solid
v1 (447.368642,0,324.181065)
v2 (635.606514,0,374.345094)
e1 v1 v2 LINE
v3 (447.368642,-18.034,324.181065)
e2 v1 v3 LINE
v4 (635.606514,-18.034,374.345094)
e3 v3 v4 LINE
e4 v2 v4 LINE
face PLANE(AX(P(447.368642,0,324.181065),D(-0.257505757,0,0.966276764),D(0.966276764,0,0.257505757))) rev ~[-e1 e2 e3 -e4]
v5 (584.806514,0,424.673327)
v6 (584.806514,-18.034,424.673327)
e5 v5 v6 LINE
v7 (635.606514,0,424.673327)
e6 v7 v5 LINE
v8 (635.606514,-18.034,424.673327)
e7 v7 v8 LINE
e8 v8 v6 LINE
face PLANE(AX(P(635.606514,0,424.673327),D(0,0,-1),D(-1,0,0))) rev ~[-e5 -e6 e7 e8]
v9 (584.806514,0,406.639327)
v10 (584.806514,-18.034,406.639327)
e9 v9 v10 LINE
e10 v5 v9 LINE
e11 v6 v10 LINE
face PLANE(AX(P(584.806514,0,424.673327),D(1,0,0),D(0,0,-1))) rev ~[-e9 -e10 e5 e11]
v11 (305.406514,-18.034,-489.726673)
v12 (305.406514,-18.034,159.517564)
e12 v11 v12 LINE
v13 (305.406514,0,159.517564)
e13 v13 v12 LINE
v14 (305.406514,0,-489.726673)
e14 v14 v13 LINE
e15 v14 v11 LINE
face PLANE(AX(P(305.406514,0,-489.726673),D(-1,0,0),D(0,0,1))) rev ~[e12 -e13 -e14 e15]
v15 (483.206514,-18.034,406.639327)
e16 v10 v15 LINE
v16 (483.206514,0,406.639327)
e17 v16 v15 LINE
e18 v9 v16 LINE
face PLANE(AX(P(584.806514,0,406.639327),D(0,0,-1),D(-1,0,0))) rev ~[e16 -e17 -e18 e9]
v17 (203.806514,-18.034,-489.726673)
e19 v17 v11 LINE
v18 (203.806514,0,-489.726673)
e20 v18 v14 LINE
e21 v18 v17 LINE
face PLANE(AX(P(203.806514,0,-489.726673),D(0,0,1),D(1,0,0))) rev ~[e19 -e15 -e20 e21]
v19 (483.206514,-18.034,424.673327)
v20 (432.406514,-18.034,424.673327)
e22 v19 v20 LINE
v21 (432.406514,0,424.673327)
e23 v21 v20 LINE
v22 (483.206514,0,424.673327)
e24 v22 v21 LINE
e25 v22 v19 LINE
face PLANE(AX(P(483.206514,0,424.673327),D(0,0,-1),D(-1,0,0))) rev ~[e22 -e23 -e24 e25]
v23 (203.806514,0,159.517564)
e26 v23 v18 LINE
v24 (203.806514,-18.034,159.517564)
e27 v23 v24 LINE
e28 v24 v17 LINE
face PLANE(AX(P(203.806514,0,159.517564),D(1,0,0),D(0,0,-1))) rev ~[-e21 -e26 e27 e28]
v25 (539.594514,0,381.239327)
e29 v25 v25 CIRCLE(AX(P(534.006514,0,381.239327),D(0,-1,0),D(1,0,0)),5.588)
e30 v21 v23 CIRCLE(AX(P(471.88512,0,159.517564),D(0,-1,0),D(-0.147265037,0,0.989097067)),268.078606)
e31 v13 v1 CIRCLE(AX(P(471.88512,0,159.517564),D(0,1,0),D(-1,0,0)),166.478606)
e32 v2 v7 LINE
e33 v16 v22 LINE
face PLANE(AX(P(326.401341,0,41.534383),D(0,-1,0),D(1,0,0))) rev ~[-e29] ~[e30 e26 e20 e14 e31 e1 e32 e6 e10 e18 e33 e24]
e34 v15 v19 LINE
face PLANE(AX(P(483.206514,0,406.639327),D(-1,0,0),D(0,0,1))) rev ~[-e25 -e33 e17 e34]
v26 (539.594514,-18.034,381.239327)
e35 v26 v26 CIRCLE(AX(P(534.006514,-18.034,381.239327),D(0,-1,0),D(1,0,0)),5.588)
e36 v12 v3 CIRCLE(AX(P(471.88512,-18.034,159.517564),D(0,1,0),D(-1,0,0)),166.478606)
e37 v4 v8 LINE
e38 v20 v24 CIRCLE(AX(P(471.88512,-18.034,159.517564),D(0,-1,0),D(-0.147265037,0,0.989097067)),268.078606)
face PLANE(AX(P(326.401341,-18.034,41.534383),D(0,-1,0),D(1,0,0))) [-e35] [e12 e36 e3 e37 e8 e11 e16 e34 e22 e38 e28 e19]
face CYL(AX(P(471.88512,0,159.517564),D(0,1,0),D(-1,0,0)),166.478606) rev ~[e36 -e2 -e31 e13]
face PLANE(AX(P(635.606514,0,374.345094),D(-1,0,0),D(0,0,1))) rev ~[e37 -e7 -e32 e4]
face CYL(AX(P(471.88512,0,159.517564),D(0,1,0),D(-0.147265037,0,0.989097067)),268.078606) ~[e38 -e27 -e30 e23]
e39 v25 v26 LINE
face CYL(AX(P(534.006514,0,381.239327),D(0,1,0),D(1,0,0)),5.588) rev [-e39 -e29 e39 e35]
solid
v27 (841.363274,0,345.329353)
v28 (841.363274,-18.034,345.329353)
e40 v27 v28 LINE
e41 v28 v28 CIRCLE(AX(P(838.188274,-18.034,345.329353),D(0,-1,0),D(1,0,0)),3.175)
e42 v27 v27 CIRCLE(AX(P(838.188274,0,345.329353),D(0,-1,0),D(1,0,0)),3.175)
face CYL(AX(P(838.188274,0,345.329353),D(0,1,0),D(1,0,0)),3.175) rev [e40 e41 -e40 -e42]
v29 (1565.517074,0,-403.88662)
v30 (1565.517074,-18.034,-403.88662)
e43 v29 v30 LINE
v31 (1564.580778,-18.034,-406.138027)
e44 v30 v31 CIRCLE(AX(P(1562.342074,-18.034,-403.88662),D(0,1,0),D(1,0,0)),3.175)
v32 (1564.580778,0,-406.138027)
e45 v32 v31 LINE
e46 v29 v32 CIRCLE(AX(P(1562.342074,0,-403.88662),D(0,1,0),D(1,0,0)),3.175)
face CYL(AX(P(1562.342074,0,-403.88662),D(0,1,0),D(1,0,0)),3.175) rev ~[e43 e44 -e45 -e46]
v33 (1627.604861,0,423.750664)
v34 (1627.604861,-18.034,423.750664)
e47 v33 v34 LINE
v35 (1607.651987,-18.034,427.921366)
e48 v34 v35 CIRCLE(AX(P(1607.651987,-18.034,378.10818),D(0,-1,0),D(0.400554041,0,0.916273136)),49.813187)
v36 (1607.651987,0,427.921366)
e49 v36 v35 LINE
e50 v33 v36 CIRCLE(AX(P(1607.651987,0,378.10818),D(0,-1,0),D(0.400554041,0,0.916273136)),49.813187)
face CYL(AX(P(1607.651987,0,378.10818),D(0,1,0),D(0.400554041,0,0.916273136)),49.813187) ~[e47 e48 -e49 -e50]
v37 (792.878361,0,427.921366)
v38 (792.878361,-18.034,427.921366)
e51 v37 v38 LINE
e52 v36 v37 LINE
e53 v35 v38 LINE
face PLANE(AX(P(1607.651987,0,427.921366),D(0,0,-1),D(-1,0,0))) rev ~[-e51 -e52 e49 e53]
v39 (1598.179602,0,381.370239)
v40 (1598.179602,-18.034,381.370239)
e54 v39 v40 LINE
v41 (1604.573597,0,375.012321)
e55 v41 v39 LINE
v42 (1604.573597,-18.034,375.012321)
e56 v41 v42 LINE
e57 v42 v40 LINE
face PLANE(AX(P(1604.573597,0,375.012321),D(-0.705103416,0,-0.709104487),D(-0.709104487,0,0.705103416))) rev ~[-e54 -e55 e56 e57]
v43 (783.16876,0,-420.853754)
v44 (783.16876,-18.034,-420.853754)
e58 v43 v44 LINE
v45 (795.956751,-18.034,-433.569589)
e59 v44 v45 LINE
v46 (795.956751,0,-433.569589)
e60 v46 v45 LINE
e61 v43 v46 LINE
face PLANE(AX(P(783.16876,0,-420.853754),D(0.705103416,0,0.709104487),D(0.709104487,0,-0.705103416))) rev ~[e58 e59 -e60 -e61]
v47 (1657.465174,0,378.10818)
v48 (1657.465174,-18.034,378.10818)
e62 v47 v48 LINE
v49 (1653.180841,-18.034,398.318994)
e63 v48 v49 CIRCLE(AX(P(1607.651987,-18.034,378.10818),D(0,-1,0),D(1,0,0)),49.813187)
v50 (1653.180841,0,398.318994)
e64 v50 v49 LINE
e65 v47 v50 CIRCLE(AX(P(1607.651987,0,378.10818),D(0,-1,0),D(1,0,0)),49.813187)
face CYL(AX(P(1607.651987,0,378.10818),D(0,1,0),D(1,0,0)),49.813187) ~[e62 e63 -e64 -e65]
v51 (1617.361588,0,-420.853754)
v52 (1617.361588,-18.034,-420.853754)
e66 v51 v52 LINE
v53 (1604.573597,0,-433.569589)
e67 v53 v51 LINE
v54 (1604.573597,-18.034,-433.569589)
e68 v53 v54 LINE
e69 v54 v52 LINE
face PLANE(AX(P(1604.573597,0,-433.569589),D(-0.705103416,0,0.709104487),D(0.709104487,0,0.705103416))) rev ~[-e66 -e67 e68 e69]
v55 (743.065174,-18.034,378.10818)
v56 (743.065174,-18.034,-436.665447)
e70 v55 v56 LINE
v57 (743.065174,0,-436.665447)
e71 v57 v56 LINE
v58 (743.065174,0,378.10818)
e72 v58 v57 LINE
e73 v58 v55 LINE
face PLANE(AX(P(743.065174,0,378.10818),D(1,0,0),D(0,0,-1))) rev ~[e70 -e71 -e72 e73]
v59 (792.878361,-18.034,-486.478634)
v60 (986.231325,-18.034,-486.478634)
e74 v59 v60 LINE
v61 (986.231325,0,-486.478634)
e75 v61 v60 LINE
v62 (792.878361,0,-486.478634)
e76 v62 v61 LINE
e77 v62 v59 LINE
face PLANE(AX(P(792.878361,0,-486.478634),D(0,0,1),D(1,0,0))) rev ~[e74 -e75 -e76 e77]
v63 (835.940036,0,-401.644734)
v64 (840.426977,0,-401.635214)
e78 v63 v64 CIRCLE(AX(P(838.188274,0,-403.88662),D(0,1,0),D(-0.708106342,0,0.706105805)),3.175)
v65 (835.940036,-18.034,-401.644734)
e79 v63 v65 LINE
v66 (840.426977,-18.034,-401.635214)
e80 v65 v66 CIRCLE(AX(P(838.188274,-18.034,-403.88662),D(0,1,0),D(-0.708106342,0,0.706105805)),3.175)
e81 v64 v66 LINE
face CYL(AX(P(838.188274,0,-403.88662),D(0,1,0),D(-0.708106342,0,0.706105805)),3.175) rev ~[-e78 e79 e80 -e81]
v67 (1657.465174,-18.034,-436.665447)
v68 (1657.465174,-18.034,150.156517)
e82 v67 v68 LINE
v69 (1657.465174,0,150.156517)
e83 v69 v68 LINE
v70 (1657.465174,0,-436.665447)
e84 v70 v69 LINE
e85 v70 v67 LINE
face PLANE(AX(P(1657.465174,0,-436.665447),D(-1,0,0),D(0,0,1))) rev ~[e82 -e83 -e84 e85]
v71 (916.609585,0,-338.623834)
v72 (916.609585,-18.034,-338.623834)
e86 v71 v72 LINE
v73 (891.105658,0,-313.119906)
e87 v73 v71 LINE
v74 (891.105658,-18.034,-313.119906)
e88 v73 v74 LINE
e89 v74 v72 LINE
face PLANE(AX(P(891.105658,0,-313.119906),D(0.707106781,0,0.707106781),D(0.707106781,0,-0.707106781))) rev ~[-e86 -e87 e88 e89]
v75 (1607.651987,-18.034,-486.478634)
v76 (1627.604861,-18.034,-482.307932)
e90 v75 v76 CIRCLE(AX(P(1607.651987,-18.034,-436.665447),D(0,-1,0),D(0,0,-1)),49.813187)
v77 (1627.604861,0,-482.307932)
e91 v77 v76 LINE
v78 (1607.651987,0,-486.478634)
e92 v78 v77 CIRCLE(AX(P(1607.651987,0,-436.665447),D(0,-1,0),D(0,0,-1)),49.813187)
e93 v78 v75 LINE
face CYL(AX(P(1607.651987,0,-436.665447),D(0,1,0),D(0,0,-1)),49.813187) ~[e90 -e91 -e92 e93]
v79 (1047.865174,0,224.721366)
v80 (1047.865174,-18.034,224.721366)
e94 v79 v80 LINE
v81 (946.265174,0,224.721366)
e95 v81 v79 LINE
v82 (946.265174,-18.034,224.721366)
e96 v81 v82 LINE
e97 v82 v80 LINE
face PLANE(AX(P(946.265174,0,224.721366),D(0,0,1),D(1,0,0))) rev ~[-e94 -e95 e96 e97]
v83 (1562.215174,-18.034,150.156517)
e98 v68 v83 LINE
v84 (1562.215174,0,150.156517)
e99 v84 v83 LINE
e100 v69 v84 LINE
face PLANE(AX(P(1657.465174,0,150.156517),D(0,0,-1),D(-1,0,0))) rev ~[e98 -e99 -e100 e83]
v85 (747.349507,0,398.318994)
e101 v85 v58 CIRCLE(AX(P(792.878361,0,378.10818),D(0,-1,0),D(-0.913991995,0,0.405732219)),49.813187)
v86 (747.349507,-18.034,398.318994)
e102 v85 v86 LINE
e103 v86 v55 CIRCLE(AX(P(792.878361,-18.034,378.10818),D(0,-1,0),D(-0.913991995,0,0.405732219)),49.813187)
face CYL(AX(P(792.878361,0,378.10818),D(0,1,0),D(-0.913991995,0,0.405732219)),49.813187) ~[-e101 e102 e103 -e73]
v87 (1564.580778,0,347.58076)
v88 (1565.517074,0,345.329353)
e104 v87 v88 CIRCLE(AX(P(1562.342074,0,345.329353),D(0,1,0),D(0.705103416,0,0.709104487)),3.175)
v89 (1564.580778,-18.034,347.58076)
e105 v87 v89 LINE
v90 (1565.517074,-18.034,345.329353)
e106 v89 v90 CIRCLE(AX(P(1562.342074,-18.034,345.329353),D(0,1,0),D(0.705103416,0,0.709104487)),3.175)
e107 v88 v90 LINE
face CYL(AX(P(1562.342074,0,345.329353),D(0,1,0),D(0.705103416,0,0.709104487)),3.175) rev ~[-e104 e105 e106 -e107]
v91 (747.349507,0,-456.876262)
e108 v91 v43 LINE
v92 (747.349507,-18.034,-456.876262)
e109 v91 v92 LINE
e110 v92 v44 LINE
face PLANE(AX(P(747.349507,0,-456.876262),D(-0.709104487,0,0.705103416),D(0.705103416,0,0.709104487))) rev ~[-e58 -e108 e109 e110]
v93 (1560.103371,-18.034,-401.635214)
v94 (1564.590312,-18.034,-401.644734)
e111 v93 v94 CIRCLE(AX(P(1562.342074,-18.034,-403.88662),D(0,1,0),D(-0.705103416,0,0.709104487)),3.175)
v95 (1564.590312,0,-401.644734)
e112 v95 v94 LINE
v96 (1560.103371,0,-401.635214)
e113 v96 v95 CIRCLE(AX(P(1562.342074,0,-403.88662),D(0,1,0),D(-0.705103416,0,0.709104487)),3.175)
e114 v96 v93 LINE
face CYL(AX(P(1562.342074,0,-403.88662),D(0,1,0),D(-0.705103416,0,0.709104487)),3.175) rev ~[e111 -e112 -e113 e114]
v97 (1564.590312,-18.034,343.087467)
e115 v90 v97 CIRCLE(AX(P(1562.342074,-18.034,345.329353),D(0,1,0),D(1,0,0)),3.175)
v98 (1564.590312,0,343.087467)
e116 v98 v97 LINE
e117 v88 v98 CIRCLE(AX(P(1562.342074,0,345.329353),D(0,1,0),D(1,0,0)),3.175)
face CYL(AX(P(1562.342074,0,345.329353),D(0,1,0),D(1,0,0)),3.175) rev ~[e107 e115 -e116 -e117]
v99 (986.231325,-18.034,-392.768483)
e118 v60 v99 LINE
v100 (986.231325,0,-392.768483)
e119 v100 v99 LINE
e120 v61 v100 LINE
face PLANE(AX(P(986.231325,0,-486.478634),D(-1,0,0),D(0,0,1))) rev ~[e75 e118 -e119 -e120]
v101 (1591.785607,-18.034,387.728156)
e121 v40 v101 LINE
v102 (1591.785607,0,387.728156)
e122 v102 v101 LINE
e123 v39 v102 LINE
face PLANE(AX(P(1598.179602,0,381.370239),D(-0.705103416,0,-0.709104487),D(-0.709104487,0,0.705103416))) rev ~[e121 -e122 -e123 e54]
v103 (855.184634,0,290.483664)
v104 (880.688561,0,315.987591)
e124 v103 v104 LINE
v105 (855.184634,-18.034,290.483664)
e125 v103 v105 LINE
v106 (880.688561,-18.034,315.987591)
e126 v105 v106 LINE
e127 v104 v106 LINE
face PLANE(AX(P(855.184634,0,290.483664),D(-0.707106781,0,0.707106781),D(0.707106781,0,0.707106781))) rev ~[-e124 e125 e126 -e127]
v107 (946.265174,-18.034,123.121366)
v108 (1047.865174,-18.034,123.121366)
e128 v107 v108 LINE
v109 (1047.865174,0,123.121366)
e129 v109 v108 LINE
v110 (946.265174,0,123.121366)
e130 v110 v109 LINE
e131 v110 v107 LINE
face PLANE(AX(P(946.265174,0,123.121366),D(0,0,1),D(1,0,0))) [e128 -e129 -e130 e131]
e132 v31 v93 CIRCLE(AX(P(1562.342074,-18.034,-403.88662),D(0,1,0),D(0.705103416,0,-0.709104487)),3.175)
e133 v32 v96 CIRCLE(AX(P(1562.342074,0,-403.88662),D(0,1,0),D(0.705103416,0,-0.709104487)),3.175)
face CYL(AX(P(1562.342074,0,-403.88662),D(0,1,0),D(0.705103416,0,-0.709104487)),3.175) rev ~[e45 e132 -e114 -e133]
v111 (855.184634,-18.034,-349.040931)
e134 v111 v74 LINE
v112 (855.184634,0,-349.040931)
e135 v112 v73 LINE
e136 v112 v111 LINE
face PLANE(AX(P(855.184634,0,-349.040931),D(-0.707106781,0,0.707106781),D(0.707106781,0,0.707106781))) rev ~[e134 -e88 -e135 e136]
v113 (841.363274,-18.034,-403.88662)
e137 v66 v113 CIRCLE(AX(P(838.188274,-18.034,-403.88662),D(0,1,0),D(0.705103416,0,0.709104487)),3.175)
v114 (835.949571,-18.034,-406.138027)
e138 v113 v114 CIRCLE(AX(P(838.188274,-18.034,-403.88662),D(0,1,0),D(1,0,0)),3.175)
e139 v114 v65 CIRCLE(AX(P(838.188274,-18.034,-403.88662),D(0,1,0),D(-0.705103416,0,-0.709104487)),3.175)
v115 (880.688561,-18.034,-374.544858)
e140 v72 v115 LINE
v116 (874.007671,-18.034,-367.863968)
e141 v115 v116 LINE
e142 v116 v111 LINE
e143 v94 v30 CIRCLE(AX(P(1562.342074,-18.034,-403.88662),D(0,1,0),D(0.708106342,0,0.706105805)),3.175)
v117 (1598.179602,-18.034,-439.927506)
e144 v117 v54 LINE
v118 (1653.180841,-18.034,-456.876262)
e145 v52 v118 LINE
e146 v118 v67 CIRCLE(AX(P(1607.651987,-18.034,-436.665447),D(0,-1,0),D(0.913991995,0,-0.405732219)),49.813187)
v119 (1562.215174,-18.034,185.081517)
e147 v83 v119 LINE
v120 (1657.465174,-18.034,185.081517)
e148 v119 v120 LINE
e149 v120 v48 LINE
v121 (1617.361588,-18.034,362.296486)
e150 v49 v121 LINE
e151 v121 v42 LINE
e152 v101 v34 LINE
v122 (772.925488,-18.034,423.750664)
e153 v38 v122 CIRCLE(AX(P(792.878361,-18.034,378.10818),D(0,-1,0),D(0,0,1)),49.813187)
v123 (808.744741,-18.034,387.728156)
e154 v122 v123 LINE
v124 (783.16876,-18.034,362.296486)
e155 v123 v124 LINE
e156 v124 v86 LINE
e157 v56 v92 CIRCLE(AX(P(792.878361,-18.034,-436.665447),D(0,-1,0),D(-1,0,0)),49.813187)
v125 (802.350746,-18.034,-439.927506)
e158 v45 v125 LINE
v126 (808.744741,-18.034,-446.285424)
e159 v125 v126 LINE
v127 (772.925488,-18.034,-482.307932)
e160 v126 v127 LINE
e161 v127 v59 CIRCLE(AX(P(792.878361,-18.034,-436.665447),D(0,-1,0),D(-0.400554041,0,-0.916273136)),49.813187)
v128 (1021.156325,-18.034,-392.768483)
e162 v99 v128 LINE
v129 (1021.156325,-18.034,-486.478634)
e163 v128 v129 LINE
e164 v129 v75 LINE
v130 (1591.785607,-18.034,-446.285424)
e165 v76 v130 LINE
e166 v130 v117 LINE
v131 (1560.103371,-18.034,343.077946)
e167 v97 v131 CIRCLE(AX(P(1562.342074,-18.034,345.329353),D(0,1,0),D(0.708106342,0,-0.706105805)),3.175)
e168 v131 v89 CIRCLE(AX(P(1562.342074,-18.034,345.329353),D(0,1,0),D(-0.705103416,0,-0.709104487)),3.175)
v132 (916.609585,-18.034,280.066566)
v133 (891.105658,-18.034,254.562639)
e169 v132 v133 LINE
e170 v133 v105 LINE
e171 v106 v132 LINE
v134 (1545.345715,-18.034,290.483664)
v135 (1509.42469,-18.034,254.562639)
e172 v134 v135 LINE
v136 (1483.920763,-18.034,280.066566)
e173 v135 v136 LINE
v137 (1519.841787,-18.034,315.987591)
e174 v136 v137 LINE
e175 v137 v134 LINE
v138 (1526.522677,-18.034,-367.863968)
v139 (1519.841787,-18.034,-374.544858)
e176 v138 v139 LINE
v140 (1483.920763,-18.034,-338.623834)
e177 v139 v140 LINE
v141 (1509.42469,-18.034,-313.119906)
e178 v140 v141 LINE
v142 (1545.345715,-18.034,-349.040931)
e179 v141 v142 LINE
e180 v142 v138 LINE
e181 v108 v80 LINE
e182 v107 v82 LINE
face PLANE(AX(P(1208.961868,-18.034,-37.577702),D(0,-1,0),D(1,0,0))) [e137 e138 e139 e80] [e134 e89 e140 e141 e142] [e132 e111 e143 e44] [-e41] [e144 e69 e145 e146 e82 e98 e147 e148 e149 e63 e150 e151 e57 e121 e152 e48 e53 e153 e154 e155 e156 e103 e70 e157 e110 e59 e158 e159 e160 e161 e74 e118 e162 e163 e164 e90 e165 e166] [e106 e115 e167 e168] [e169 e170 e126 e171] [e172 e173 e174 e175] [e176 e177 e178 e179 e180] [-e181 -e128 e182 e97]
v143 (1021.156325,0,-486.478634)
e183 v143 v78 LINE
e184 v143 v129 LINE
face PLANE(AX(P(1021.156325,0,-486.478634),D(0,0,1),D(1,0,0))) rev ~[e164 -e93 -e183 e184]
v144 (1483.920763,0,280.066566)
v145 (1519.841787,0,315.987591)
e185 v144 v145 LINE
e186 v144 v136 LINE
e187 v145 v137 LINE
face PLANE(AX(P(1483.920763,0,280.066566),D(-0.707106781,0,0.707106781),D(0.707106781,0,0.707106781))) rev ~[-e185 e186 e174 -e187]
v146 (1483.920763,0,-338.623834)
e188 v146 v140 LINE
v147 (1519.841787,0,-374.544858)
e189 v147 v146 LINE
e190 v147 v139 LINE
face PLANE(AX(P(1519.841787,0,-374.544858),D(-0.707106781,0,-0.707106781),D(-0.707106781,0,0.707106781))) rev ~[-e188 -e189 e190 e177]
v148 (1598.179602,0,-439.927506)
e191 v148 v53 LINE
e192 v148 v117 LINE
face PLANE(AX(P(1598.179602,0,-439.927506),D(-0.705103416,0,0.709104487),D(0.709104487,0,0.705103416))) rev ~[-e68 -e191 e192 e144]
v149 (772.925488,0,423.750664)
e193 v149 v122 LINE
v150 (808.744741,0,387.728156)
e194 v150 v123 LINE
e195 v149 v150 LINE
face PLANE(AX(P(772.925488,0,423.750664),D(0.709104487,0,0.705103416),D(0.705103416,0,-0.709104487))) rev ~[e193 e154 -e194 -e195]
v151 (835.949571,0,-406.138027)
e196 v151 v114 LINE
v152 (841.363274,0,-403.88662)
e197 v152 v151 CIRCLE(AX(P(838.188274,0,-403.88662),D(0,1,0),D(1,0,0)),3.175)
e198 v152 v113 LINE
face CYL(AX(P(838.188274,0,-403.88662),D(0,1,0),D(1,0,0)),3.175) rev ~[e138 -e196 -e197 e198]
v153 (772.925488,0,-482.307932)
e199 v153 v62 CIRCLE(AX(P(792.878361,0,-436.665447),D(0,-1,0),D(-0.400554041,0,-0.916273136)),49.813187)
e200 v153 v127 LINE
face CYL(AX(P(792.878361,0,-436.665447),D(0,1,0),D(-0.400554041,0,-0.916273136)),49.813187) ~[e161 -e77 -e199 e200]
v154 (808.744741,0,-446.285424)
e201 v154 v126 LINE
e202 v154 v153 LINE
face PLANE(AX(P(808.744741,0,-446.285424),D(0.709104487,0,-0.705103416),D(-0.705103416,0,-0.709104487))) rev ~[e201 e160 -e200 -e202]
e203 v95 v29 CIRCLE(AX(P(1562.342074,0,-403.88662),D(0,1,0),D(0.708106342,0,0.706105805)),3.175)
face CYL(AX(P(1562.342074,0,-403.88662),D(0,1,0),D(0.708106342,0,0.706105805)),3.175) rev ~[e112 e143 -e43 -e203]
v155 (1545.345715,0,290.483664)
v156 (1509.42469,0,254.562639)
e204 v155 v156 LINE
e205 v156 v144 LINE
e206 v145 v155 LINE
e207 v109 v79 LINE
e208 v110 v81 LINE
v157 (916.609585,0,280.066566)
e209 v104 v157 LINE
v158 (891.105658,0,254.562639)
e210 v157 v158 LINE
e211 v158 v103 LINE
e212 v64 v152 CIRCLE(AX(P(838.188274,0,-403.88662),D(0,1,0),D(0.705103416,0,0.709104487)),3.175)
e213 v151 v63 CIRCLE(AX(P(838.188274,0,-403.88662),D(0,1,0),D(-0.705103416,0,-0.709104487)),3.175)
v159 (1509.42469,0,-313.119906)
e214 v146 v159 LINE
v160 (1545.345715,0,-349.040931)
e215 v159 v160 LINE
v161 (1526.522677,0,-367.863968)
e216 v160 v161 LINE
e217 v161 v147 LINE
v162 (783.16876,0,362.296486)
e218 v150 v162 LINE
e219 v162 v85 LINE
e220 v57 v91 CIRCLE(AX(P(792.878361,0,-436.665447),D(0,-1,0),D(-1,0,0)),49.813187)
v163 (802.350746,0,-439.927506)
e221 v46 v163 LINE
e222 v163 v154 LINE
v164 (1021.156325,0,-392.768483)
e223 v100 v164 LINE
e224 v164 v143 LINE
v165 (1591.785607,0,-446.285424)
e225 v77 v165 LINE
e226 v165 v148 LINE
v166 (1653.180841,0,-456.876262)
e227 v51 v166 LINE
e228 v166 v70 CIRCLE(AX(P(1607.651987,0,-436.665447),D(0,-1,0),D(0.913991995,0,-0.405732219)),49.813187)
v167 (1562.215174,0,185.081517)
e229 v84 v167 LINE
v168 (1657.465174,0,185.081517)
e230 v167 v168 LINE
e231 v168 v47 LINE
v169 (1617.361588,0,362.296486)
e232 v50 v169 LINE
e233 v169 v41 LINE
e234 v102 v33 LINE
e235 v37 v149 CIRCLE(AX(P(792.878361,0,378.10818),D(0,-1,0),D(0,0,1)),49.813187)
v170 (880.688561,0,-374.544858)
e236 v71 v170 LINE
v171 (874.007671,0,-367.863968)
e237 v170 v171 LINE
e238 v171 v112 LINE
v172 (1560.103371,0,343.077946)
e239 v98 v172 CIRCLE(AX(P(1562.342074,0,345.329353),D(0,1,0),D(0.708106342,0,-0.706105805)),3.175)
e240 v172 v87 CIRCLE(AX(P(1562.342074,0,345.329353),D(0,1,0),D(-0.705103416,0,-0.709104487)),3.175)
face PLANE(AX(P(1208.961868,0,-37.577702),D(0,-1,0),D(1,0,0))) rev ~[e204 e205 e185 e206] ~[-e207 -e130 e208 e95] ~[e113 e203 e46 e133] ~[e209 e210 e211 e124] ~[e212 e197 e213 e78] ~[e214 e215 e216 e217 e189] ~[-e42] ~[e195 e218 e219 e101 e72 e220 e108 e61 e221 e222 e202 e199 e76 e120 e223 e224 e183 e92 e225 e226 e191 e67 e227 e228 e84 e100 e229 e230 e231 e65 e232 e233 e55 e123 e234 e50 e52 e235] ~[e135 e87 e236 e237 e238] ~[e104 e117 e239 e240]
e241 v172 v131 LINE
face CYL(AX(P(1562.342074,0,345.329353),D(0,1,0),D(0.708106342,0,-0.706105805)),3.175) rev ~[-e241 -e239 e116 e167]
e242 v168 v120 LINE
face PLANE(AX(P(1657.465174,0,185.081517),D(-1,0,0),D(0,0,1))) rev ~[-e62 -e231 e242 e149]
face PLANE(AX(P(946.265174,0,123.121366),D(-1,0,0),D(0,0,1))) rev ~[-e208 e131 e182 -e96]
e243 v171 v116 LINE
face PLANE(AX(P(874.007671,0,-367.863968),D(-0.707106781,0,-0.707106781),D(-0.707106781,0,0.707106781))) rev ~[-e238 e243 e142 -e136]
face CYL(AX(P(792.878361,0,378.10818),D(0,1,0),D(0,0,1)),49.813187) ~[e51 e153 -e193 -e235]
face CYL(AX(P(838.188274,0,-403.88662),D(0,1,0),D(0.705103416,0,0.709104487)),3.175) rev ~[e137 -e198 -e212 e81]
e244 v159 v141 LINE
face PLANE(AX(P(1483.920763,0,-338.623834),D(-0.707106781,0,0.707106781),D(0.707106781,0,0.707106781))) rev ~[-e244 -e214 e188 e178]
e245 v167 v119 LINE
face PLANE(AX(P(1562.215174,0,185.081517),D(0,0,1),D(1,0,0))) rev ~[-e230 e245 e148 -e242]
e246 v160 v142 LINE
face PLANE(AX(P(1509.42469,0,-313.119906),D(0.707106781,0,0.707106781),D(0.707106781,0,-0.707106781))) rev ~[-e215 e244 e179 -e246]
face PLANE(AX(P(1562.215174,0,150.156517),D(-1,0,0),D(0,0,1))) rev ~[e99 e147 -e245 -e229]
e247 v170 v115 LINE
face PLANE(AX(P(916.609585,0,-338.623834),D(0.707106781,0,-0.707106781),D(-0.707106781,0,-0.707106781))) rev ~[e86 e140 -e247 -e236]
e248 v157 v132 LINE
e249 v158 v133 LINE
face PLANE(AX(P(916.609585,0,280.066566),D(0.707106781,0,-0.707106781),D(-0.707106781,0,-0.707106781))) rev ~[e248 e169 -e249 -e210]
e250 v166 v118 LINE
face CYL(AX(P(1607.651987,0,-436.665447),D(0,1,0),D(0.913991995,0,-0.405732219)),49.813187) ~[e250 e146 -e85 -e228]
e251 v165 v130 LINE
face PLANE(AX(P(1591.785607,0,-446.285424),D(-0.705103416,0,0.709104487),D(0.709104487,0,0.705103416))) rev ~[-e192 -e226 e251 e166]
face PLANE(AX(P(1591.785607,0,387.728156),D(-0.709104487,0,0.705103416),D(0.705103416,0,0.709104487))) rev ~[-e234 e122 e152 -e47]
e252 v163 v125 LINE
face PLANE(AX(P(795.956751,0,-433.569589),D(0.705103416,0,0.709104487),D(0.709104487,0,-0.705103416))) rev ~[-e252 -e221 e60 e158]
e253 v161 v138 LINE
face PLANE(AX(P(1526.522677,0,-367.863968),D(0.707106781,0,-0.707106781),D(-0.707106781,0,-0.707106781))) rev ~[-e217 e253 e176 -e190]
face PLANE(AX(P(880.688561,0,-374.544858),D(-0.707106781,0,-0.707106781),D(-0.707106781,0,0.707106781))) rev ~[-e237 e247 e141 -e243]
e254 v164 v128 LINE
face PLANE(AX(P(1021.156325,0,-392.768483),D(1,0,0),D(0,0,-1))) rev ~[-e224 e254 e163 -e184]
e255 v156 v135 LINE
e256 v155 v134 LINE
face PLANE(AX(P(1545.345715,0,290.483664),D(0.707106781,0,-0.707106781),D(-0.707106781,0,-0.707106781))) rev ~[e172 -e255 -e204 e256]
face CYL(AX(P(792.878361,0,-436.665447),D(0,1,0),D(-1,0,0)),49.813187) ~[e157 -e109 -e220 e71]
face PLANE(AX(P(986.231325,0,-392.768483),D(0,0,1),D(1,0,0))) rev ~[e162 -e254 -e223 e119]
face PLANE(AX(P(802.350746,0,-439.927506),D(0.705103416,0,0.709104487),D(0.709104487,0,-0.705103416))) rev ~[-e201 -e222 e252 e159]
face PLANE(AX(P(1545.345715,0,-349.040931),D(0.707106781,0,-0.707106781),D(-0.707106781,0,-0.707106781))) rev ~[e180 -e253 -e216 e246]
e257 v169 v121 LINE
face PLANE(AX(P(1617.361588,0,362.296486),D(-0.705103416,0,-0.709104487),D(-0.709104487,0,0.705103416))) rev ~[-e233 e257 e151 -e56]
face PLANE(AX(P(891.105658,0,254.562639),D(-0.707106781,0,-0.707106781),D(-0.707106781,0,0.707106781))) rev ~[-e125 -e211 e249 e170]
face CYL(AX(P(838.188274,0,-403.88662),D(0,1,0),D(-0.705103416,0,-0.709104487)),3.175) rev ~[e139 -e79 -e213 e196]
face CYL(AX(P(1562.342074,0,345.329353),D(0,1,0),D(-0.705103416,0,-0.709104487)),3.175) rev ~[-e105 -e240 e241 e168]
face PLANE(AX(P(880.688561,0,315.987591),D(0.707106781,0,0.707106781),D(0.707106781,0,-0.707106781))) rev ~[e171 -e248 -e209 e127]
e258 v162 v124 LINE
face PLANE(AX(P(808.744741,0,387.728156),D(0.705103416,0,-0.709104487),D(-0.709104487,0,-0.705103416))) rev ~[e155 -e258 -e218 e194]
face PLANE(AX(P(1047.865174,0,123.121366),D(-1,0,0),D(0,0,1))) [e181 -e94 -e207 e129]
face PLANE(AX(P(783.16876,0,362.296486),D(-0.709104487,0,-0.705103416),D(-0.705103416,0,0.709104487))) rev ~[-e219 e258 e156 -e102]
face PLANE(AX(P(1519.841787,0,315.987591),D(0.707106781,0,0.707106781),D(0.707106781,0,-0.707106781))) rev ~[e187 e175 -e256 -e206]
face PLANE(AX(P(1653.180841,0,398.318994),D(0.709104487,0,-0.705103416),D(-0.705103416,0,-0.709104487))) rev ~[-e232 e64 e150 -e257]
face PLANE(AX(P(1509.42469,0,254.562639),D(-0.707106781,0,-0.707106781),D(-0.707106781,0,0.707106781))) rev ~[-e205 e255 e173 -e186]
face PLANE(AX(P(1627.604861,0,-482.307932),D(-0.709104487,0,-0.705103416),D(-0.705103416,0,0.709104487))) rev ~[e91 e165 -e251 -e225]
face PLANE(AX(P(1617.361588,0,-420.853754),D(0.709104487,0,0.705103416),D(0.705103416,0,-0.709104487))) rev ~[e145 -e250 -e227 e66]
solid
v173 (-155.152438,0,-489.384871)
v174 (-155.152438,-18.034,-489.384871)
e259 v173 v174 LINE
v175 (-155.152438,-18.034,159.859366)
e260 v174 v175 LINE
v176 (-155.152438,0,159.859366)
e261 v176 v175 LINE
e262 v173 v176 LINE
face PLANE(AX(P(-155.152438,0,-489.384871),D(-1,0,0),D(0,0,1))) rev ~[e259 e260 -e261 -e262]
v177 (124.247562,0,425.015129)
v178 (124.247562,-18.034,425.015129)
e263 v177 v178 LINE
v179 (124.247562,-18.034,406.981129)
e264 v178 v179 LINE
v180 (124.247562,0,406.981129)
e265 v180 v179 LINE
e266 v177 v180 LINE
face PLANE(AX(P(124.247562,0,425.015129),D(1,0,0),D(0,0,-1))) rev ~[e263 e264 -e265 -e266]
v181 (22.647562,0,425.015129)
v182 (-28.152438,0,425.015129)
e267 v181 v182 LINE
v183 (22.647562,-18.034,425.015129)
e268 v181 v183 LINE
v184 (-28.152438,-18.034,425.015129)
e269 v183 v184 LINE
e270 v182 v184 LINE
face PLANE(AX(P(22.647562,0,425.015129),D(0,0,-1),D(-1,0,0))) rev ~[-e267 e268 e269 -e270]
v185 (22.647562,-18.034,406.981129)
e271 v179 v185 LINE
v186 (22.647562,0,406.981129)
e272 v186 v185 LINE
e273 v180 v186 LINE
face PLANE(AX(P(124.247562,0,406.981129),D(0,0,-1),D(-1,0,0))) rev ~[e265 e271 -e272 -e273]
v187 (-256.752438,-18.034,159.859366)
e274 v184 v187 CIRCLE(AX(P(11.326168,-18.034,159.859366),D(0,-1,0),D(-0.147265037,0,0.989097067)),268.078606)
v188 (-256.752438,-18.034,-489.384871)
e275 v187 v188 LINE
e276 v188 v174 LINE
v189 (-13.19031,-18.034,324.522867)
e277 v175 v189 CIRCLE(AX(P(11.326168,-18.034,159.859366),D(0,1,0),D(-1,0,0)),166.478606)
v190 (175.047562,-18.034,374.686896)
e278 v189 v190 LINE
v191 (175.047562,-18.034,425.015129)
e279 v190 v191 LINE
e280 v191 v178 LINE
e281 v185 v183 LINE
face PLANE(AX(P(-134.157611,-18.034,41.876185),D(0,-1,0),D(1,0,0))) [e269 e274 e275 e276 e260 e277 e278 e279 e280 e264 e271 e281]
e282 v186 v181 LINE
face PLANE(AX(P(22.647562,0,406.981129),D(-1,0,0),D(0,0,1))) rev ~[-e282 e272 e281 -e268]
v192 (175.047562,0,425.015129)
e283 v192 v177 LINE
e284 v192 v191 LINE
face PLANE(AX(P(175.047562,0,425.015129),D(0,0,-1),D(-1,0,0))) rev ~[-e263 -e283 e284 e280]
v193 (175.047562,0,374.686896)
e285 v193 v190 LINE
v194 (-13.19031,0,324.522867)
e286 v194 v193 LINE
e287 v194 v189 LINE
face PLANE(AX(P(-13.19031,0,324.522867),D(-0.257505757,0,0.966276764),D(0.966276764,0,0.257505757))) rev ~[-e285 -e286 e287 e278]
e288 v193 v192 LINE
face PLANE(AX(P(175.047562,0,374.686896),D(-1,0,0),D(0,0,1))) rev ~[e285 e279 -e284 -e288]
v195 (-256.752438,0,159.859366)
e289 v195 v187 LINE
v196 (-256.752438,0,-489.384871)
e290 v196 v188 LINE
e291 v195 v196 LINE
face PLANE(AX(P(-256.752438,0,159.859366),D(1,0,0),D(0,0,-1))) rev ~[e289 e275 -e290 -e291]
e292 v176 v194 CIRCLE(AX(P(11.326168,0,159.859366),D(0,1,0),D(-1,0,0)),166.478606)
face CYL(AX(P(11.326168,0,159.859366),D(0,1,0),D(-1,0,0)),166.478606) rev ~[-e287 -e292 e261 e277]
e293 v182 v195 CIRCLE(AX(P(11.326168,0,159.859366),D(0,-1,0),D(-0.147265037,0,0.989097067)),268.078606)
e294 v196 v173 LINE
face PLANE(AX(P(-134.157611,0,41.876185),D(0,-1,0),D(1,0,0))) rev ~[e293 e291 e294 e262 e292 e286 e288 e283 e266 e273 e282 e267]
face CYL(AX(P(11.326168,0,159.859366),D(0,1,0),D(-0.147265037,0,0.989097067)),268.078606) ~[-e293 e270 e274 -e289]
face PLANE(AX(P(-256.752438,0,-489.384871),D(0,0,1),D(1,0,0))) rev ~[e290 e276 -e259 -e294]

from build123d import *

# Parameters (mm, degrees)
F0_R     = 5.588
F1_DEPTH = 18.034
F0_W     = 101.6
F0_H     = 101.6
F0_R_2   = 3.175


# Not quite as in the source:
# - a feature names something its author has since deleted; it is built from what else it names


with BuildPart() as f1:
    # F0 (on Front) → F1 (new body)
    with BuildSketch(Plane.XZ):
        with BuildLine():
            Line((483.2065144254, 424.6733268274), (432.4065144254, 424.6733268274))
            ThreePointArc((432.4065144254, 424.6733268274), (268.8463203697, 334.5643709124), (203.8065144254, 159.5175638624))
            Line((203.8065144254, 159.5175638624), (203.8065144254, -489.7266731726))
            Line((203.8065144254, -489.7266731726), (305.4065144254, -489.7266731726))
            Line((305.4065144254, -489.7266731726), (305.4065144254, 159.5175638624))
            ThreePointArc((305.4065144254, 159.5175638624), (345.7966685973, 268.2228009306), (447.3686422275, 324.1810647789))
            Line((447.3686422275, 324.1810647789), (635.6065144254, 374.3450939655))
            Line((635.6065144254, 374.3450939655), (635.6065144254, 406.6393268274))
            Line((635.6065144254, 406.6393268274), (635.6065144254, 424.6733268274))
            Line((635.6065144254, 424.6733268274), (584.8065144254, 424.6733268274))
            Line((584.8065144254, 424.6733268274), (584.8065144254, 406.6393268274))
            Line((584.8065144254, 406.6393268274), (483.2065144254, 406.6393268274))
            Line((483.2065144254, 406.6393268274), (483.2065144254, 424.6733268274))
        make_face()
        with Locations((534.0065144254, 381.2393268274)):
            Circle(F0_R, mode=Mode.SUBTRACT)
    extrude(amount=F1_DEPTH)


with BuildPart() as f1b:
    # F0 (on Front) → F1, piece 2 (new body)
    with BuildSketch(Plane.XZ):
        with BuildLine():
            Line((1607.6519874032, 427.9213663064), (792.8783607687, 427.9213663064))
            ThreePointArc((792.8783607687, 427.9213663064), (782.6863062078, 426.8675437634), (772.9254875333, 423.7506644064))
            Line((772.9254875333, 423.7506644064), (808.7447410617, 387.7281564889))
            Line((808.7447410617, 387.7281564889), (795.956750751, 375.0123214863))
            Line((795.956750751, 375.0123214863), (783.1687604403, 362.2964864837))
            Line((783.1687604403, 362.2964864837), (747.3495069119, 398.3189944012))
            ThreePointArc((747.3495069119, 398.3189944012), (744.1480269708, 388.4381426165), (743.0651740859, 378.1081796236))
            Line((743.0651740859, 378.1081796236), (743.0651740859, -436.6654470109))
            ThreePointArc((743.0651740859, -436.6654470109), (744.1480269708, -446.9954100037), (747.3495069119, -456.8762617884))
            Line((747.3495069118, -456.8762617884), (783.1687604403, -420.8537538709))
            Line((783.1687604403, -420.8537538709), (795.956750751, -433.5695888735))
            Line((795.956750751, -433.5695888735), (802.3507459063, -439.9275063748))
            Line((802.3507459063, -439.9275063748), (808.7447410617, -446.2854238761))
            Line((808.7447410617, -446.2854238761), (772.9254875333, -482.3079317936))
            ThreePointArc((772.9254875333, -482.3079317936), (782.6863062078, -485.4248111507), (792.8783607687, -486.4786336936))
            Line((792.8783607687, -486.4786336936), (986.2313252449, -486.4786336936))
            Line((986.2313252449, -486.4786336936), (986.2313252449, -392.7684829235))
            Line((986.2313252449, -392.7684829235), (1021.1563252449, -392.7684829235))
            Line((1021.1563252449, -392.7684829235), (1021.1563252449, -486.4786336936))
            Line((1021.1563252449, -486.4786336936), (1607.6519874032, -486.4786336936))
            ThreePointArc((1607.6519874032, -486.4786336936), (1617.8440419641, -485.4248111507), (1627.6048606386, -482.3079317936))
            Line((1627.6048606386, -482.3079317936), (1591.7856071102, -446.2854238761))
            Line((1591.7856071102, -446.2854238761), (1598.1796022655, -439.9275063748))
            Line((1598.1796022655, -439.9275063748), (1604.5735974209, -433.5695888735))
            Line((1604.5735974209, -433.5695888735), (1617.3615877316, -420.8537538709))
            Line((1617.3615877316, -420.8537538709), (1653.18084126, -456.8762617884))
            ThreePointArc((1653.18084126, -456.8762617884), (1656.3823212011, -446.9954100037), (1657.4651740859, -436.6654470109))
            Line((1657.4651740859, -436.6654470109), (1657.4651740859, 150.1565170765))
            Line((1657.4651740859, 150.1565170765), (1562.2151740859, 150.1565170765))
            Line((1562.2151740859, 150.1565170765), (1562.2151740859, 185.0815170765))
            Line((1562.2151740859, 185.0815170765), (1657.4651740859, 185.0815170765))
            Line((1657.4651740859, 185.0815170765), (1657.4651740859, 378.1081796236))
            ThreePointArc((1657.4651740859, 378.1081796236), (1656.3823212011, 388.4381426165), (1653.18084126, 398.3189944012))
            Line((1653.18084126, 398.3189944012), (1617.3615877316, 362.2964864837))
            Line((1617.3615877316, 362.2964864837), (1604.5735974209, 375.0123214863))
            Line((1604.5735974209, 375.0123214863), (1598.1796022655, 381.3702389876))
            Line((1598.1796022655, 381.3702389876), (1591.7856071102, 387.7281564889))
            Line((1591.7856071102, 387.7281564889), (1627.6048606386, 423.7506644064))
            ThreePointArc((1627.6048606386, 423.7506644064), (1617.8440419641, 426.8675437634), (1607.6519874032, 427.9213663064))
        make_face()
        with BuildLine():
            ThreePointArc((841.3632739356, -403.8866202588), (839.4074420696, -406.8182160804), (835.9495705901, -406.1380270037))
            ThreePointArc((835.9495705901, -406.1380270037), (835.0132810832, -403.8933572576), (835.9400362986, -401.6447343278))
            ThreePointArc((835.9400362986, -401.6447343278), (838.1815369368, -400.7116274064), (840.4269772811, -401.635213514))
            ThreePointArc((840.4269772811, -401.635213514), (841.1198697572, -402.6674521248), (841.3632739356, -403.8866202588))
        make_face(mode=Mode.SUBTRACT)
        Polygon((880.6885609861, -374.5448583408), (874.0076708186, -367.8639681733), (855.1846336023, -349.0409309569), (891.1056580866, -313.1199064727), (916.6095854704, -338.6238338565), align=None, mode=Mode.SUBTRACT)
        with BuildLine():
            ThreePointArc((1565.5170742363, -403.8866202588), (1565.2736700579, -405.1057883928), (1564.5807775818, -406.1380270037))
            ThreePointArc((1564.5807775818, -406.1380270037), (1560.0906674915, -406.1253236043), (1560.1033708908, -401.635213514))
            ThreePointArc((1560.1033708908, -401.635213514), (1562.3488112351, -400.7116274064), (1564.5903118733, -401.6447343278))
            ThreePointArc((1564.5903118733, -401.6447343278), (1565.2762503981, -402.6736753915), (1565.5170742363, -403.8866202588))
        make_face(mode=Mode.SUBTRACT)
        Polygon((1545.3457145696, -349.0409309569), (1526.5226773533, -367.8639681733), (1519.8417871858, -374.5448583408), (1483.9207627015, -338.6238338565), (1509.4246900853, -313.1199064727), align=None, mode=Mode.SUBTRACT)
        with Locations((997.0651740859, 173.9213663064)):
            Rectangle(F0_W, F0_H, mode=Mode.SUBTRACT)
        Polygon((891.1056580866, 254.5626390854), (855.1846336023, 290.4836635697), (880.6885609861, 315.9875909535), (916.6095854704, 280.0665664693), align=None, mode=Mode.SUBTRACT)
        with Locations((838.1882739356, 345.3293528716)):
            Circle(F0_R_2, mode=Mode.SUBTRACT)
        Polygon((1519.8417871858, 315.9875909535), (1526.5226773533, 309.306700786), (1545.3457145696, 290.4836635697), (1509.4246900853, 254.5626390854), (1483.9207627015, 280.0665664693), align=None, mode=Mode.SUBTRACT)
        with BuildLine():
            ThreePointArc((1560.1033708908, 343.0779461267), (1560.0906674915, 347.5680562171), (1564.5807775818, 347.5807596164))
            ThreePointArc((1564.5807775818, 347.5807596164), (1565.2736700579, 346.5485210056), (1565.5170742363, 345.3293528716))
            ThreePointArc((1565.5170742363, 345.3293528716), (1565.2762503981, 344.1164080042), (1564.5903118733, 343.0874669406))
            ThreePointArc((1564.5903118733, 343.0874669406), (1562.3488112351, 342.1543600192), (1560.1033708908, 343.0779461267))
        make_face(mode=Mode.SUBTRACT)
    extrude(amount=F1_DEPTH)


with BuildPart() as f1c:
    # F0 (on Front) → F1, piece 3 (new body)
    with BuildSketch(Plane.XZ):
        with BuildLine():
            Line((-256.7524378796, 159.8593657013), (-256.7524378796, -489.3848713337))
            Line((-256.7524378796, -489.3848713337), (-155.1524378796, -489.3848713337))
            Line((-155.1524378796, -489.3848713337), (-155.1524378796, 159.8593657013))
            ThreePointArc((-155.1524378796, 159.8593657013), (-114.7622837077, 268.5646027694), (-13.1903100775, 324.5228666178))
            Line((-13.1903100775, 324.5228666178), (175.0475621204, 374.6868958044))
            Line((175.0475621204, 374.6868958044), (175.0475621204, 406.9811286663))
            Line((175.0475621204, 406.9811286663), (175.0475621204, 425.0151286663))
            Line((175.0475621204, 425.0151286663), (124.2475621204, 425.0151286663))
            Line((124.2475621204, 425.0151286663), (124.2475621204, 406.9811286663))
            Line((124.2475621204, 406.9811286663), (22.6475621204, 406.9811286663))
            Line((22.6475621204, 406.9811286663), (22.6475621204, 425.0151286663))
            Line((22.6475621204, 425.0151286663), (-28.1524378796, 425.0151286663))
            ThreePointArc((-28.1524378796, 425.0151286663), (-191.7126319353, 334.9061727512), (-256.7524378796, 159.8593657013))
        make_face()
    extrude(amount=F1_DEPTH)


solid = Compound([f1.part, f1b.part, f1c.part])
